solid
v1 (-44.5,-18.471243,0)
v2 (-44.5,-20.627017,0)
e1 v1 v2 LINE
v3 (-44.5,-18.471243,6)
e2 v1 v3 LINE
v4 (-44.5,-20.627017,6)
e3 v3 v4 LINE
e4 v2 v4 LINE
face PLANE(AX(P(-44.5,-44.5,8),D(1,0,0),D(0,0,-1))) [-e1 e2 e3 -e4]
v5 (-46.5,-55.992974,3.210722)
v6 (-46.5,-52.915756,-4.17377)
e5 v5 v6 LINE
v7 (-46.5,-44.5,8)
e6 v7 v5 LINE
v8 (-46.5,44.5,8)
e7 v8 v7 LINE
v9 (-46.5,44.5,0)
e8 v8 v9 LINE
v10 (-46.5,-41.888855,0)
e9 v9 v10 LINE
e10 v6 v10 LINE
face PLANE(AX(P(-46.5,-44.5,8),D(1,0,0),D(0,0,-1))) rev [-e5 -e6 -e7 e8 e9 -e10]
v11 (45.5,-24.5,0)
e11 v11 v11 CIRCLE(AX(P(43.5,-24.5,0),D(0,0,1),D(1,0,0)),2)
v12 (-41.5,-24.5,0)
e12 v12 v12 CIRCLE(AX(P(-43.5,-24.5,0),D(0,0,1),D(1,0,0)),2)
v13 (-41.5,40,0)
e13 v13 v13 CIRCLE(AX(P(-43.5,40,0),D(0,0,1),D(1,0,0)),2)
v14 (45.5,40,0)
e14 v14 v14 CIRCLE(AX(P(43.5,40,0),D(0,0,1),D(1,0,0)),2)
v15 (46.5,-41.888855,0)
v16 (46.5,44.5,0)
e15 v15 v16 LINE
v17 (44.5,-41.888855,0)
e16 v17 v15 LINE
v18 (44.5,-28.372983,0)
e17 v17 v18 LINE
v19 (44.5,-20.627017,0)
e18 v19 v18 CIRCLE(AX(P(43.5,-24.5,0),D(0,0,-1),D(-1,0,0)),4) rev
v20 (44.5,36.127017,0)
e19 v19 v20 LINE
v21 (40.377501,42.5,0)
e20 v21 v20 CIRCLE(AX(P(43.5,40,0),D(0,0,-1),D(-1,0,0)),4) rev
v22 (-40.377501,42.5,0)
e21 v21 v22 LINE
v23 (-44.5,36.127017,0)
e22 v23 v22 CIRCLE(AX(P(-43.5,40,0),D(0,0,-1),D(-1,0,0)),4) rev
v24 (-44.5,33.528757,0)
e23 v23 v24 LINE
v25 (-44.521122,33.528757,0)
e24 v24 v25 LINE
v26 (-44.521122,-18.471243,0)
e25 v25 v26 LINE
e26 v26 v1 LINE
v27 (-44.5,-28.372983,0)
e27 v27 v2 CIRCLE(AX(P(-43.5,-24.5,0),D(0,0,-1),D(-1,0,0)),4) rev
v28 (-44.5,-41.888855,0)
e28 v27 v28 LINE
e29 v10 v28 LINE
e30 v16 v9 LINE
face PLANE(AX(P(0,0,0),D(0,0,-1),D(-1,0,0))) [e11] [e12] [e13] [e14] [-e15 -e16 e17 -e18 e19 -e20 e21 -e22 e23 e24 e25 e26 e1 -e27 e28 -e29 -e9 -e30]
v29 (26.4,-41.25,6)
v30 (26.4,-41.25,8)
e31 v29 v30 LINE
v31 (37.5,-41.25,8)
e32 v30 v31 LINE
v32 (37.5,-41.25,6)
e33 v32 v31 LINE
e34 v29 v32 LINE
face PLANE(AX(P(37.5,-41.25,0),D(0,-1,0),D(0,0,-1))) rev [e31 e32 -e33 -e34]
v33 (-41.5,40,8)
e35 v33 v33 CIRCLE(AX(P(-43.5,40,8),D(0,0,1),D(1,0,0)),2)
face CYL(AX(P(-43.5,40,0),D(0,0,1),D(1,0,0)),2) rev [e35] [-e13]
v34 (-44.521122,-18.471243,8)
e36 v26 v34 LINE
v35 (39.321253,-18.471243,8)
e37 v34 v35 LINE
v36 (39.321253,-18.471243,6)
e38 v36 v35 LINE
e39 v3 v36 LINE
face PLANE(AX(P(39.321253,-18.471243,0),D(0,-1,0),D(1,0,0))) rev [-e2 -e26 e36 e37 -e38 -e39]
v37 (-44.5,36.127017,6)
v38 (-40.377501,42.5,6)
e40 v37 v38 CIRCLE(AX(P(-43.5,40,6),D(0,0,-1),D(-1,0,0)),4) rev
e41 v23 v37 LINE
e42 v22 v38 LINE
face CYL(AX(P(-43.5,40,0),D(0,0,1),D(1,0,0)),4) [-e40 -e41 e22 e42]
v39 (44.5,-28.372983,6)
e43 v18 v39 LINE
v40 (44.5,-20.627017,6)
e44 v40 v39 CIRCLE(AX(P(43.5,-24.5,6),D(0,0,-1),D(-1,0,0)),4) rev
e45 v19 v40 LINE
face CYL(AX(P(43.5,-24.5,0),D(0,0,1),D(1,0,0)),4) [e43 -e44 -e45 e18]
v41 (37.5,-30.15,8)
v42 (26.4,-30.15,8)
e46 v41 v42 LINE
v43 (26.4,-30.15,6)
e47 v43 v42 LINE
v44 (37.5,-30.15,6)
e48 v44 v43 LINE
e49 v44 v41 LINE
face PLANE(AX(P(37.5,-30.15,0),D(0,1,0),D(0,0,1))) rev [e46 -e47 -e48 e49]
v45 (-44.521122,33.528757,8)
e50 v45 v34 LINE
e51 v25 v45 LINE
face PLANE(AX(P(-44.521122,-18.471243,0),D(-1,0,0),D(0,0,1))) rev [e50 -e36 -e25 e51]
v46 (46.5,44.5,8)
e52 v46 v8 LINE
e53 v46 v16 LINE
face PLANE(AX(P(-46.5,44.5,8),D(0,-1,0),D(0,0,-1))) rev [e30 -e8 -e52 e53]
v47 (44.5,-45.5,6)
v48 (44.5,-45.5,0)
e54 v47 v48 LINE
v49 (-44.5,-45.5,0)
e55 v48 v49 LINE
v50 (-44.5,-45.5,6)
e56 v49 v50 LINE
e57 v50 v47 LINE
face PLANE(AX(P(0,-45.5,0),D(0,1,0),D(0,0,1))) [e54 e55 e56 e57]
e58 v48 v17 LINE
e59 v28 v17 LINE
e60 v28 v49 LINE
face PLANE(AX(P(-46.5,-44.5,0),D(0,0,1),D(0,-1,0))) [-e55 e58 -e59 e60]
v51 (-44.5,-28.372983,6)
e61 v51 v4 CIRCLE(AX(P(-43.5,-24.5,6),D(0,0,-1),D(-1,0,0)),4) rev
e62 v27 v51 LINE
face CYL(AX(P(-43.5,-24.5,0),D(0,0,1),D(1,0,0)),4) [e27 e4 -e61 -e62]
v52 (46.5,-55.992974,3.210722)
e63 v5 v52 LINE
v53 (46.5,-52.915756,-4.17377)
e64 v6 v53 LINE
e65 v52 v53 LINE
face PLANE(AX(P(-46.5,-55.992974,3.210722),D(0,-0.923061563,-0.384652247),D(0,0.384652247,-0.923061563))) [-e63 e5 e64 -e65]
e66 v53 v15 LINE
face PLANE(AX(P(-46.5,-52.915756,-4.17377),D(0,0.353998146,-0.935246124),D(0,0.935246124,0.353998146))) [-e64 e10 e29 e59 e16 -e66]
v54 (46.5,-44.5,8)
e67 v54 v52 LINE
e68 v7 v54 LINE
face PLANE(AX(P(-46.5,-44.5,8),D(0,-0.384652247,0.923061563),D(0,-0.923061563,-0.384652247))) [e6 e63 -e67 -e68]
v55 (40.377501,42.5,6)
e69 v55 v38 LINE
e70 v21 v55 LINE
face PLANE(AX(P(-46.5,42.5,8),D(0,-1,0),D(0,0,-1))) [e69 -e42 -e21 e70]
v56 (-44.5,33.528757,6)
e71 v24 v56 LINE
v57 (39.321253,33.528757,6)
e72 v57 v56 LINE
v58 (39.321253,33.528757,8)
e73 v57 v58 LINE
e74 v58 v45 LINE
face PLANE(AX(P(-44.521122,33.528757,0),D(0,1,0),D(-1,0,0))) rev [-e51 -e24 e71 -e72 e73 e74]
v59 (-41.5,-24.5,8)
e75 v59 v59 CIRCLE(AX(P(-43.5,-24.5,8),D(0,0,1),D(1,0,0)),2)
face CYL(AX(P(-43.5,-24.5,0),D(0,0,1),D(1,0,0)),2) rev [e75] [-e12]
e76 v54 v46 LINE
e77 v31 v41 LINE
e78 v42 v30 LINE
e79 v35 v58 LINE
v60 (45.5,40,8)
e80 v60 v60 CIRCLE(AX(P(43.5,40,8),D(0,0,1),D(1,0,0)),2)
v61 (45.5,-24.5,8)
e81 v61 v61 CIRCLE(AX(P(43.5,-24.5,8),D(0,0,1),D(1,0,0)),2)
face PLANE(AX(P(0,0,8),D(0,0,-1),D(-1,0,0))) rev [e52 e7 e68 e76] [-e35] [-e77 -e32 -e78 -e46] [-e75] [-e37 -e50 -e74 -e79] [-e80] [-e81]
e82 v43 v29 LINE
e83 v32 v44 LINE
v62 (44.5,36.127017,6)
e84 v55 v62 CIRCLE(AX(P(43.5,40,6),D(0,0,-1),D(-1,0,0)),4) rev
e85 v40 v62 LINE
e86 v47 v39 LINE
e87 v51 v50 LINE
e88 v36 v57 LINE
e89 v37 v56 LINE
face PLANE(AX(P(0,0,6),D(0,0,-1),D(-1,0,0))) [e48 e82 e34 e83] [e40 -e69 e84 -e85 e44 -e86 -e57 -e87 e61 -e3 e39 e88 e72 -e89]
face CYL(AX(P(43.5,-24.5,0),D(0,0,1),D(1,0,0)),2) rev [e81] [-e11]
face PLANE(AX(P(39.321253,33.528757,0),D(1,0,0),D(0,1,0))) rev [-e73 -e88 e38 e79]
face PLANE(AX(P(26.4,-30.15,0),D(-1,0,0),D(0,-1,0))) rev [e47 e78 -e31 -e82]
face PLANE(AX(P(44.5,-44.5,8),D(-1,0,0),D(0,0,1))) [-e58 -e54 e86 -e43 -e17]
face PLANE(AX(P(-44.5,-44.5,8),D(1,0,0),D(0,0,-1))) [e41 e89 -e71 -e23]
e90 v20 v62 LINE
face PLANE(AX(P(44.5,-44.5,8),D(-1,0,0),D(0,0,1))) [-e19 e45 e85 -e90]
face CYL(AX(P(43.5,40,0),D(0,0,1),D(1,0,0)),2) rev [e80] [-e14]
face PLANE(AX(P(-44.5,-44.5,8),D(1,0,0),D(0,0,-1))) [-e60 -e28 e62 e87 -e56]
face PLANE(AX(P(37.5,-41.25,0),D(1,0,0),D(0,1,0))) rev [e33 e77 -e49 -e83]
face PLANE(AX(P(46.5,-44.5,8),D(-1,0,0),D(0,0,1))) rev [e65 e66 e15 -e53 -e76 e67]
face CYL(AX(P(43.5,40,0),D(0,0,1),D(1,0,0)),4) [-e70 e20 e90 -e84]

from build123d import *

# Parameters (mm, degrees)
SKETCH1_W           = 93
SKETCH1_H           = 89
BOSS_EXTRUDE1_DEPTH = 8
SKETCH2_R           = 2
SKETCH2_W           = 83.842374854
SKETCH2_H           = 52
SKETCH2_W_2         = 11.1
SKETCH2_H_2         = 11.1
CUT_EXTRUDE1_DEPTH  = 8
SHELL6_OUTLINE_W    = 11.1
SHELL6_OUTLINE_H    = 11.1
SHELL6_DEPTH        = 6
BOSS_EXTRUDE2_DEPTH = 93
SKETCH4_W           = 89
SKETCH4_H           = 6
CUT_EXTRUDE2_DEPTH  = 3


# Read off the part's stored shape, not the designer's step: Shell6
with BuildPart() as part:
    # Sketch1 → Boss-Extrude1 (new body)
    with BuildSketch(Plane.XY):
        Rectangle(SKETCH1_W, SKETCH1_H)
    extrude(amount=BOSS_EXTRUDE1_DEPTH)

    # Sketch2 → Cut-Extrude1 (cut)
    with BuildSketch(Plane.XY.offset(8)):
        with Locations((-43.5, 40)):
            Circle(SKETCH2_R)
        with Locations((43.5, 40)):
            Circle(SKETCH2_R)
        with Locations((-43.5, -24.5)):
            Circle(SKETCH2_R)
        with Locations((43.5, -24.5)):
            Circle(SKETCH2_R)
        with Locations((-2.599934873, 7.528756998)):
            Rectangle(SKETCH2_W, SKETCH2_H)
        with Locations((31.95, -35.7)):
            Rectangle(SKETCH2_W_2, SKETCH2_H_2)
    extrude(amount=-CUT_EXTRUDE1_DEPTH, mode=Mode.SUBTRACT)

    # Shell6 outline → Shell6 (cut)
    with BuildSketch(Plane.XY):
        with BuildLine():
            Line((-44.5, -18.471243002), (-44.5, -20.627016654))
            ThreePointArc((-44.5, -20.627016654), (-39.5, -24.5), (-44.5, -28.372983346))
            Line((-44.5, -28.372983346), (-44.5, -42.5))
            Line((-44.5, -42.5), (44.5, -42.5))
            Line((44.5, -42.5), (44.5, -28.372983346))
            ThreePointArc((44.5, -28.372983346), (39.5, -24.5), (44.5, -20.627016654))
            Line((44.5, -20.627016654), (44.5, 36.127016654))
            ThreePointArc((44.5, 36.127016654), (40.1414319, 37.827439226), (40.377501001, 42.5))
            Line((40.377501001, 42.5), (-40.377501001, 42.5))
            ThreePointArc((-40.377501001, 42.5), (-40.1414319, 37.827439226), (-44.5, 36.127016654))
            Line((-44.5, 36.127016654), (-44.5, 33.528756998))
            Line((-44.5, 33.528756998), (39.321252554, 33.528756998))
            Line((39.321252554, 33.528756998), (39.321252554, -18.471243002))
            Line((39.321252554, -18.471243002), (-44.5, -18.471243002))
        make_face()
        with Locations((31.95, -35.7)):
            Rectangle(SHELL6_OUTLINE_W, SHELL6_OUTLINE_H, mode=Mode.SUBTRACT)
    extrude(amount=SHELL6_DEPTH, mode=Mode.SUBTRACT)

    # Sketch3 → Boss-Extrude2 (add)
    with BuildSketch(Plane(origin=(46.5, 0, 0), x_dir=(0, 0, -1), z_dir=(1, 0, 0))):
        Polygon((-8, -44.5), (-3.210722285, -55.992973734), (4.173770218, -52.915755757), (0, -41.888855003), (0, -44.5), align=None)
    extrude(amount=-BOSS_EXTRUDE2_DEPTH)

    # Sketch4 → Cut-Extrude2 (cut)
    with BuildSketch(Plane(origin=(0, -42.5, 0), x_dir=(1, 0, 0), z_dir=(0, 1, 0))):
        with Locations((0, -3)):
            Rectangle(SKETCH4_W, SKETCH4_H)
    extrude(amount=-CUT_EXTRUDE2_DEPTH, mode=Mode.SUBTRACT)


solid = part.part
